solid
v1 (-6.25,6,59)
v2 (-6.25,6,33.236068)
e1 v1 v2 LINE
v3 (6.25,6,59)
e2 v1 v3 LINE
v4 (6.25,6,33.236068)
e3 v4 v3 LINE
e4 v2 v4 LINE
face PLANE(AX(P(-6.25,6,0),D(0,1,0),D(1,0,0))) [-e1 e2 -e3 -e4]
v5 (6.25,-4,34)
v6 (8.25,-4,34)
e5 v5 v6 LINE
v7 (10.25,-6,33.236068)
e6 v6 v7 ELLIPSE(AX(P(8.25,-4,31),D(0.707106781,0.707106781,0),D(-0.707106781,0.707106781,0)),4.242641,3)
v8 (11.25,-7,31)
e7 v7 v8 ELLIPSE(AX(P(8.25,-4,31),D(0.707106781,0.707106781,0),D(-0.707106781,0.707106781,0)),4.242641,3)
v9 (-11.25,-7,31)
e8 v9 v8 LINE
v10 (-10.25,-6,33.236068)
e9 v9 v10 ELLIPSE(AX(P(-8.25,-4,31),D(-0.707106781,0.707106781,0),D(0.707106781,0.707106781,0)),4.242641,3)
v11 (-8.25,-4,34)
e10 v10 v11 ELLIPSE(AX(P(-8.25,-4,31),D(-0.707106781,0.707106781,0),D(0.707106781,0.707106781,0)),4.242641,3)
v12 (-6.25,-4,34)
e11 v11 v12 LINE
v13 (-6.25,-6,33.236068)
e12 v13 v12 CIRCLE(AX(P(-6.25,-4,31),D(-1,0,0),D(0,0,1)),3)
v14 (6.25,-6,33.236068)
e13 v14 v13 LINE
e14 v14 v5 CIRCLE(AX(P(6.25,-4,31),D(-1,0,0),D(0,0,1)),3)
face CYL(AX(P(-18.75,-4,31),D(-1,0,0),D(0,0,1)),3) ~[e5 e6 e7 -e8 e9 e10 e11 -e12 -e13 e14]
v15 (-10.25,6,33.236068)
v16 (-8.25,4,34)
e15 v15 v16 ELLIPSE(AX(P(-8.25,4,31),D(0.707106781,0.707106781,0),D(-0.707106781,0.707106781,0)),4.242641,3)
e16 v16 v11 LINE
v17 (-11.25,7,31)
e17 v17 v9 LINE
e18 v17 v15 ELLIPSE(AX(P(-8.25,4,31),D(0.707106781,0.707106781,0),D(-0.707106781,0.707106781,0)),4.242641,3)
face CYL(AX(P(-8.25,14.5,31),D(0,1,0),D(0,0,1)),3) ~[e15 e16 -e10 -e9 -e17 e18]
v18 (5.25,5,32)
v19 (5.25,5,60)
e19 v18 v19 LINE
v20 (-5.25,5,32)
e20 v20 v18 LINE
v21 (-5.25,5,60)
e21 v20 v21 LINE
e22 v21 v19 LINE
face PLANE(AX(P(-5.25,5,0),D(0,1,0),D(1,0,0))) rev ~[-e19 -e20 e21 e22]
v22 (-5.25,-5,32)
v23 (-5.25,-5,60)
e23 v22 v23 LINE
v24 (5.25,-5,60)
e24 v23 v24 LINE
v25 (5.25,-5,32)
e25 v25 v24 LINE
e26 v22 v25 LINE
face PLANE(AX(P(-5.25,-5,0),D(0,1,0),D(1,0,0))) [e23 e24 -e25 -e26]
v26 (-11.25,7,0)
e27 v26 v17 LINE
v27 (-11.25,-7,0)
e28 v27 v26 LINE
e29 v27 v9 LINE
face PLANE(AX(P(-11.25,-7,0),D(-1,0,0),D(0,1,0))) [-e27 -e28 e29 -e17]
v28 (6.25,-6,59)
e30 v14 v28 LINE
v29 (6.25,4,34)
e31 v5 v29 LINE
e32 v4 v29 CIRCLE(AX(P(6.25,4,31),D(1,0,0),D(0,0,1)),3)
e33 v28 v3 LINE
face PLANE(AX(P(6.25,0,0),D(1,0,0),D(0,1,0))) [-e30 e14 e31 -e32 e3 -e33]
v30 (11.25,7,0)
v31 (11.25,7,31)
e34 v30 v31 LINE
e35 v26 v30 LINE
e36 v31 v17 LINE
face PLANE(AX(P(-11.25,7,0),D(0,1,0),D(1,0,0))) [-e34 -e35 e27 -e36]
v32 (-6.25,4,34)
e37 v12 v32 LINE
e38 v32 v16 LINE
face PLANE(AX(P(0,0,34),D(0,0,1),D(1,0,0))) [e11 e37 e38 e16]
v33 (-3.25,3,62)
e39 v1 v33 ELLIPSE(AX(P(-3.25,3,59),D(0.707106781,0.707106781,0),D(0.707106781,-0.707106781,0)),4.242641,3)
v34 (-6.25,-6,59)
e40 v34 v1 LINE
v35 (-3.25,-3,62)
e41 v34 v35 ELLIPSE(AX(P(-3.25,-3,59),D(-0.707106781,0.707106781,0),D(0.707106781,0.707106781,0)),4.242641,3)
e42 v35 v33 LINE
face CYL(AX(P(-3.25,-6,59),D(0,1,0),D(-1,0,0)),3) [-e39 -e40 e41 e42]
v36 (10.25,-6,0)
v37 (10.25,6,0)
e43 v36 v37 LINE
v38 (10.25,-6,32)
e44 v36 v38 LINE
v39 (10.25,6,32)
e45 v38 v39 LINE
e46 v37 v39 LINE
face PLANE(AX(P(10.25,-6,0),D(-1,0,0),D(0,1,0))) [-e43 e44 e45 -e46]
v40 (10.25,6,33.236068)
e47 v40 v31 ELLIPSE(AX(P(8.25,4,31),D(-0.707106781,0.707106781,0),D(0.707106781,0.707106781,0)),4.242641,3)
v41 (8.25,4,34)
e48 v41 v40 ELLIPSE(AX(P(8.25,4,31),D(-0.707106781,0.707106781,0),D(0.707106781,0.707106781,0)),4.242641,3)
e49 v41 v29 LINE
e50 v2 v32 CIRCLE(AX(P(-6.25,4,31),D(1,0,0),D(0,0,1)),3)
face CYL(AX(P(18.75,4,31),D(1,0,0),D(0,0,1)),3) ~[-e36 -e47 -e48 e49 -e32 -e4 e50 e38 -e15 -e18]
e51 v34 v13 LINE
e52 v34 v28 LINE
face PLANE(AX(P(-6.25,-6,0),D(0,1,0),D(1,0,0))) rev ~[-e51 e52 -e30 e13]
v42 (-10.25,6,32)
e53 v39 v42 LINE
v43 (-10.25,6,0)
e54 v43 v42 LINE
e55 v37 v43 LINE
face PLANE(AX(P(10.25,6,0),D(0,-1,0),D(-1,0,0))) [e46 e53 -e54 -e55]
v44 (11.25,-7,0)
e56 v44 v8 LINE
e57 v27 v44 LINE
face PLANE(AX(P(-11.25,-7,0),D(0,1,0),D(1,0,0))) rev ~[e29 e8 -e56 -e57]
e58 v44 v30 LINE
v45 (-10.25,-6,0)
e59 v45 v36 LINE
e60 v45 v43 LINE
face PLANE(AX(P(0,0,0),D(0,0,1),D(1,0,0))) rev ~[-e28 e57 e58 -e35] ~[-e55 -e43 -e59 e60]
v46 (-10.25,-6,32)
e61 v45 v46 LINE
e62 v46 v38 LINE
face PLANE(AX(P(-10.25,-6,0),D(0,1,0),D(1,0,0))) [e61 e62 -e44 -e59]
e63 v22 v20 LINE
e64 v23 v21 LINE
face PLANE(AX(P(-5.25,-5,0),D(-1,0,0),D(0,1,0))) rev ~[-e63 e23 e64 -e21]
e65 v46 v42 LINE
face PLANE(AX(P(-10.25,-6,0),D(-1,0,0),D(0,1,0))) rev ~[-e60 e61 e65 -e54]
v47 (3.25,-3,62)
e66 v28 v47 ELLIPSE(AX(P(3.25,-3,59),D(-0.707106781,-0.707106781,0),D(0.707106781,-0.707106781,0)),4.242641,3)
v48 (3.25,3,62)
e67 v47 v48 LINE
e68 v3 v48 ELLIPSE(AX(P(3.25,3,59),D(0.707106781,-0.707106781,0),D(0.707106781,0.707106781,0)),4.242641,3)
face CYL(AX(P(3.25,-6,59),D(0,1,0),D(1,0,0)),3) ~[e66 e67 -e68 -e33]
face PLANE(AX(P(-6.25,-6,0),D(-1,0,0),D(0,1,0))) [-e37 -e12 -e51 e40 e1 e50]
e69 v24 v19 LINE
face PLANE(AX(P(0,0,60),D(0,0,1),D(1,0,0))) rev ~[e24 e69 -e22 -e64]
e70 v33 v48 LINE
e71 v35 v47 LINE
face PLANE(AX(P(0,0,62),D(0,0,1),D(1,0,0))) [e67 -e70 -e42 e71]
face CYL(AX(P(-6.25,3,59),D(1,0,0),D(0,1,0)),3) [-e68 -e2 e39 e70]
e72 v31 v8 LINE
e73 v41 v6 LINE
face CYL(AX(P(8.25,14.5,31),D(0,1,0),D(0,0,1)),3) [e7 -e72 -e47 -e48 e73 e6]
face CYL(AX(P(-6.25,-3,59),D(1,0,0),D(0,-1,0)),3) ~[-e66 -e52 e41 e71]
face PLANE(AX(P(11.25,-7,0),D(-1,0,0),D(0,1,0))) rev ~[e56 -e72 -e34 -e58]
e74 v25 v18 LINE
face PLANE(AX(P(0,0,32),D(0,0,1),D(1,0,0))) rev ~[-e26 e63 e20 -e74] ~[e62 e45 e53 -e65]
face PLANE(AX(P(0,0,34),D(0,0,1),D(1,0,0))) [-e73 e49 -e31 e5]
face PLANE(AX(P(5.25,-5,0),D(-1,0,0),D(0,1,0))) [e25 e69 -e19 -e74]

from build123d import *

# Parameters (mm, degrees)
F0_W         = 12.5
F0_H         = 12
F0_W_2       = 10.5
F0_H_2       = 10
F1_DEPTH     = 62
F0_W_3       = 22.5
F0_H_3       = 14
F0_W_4       = 4
F2_DEPTH     = 34
F3_DEPTH     = 60
F4_DEPTH     = 32
F5_R         = 3
F6_T1_DEPTH  = 29
F6_T6_DEPTH  = 37.5
F6_T11_DEPTH = 37.5
F6_T16_DEPTH = 37.5
F6_T21_DEPTH = 37.5
F6_T26_DEPTH = 37.5
F6_T31_DEPTH = 37.5


# Not quite as in the source:
# - a fillet or chamfer that OpenCascade refuses, or shapes differently, is made with other operations: its cross-section is extruded or revolved along the edge and cut away or added


with BuildPart() as f1:
    # F0 (on Top) → F1 (new body)
    with BuildSketch(Plane.XY):
        Rectangle(F0_W, F0_H)
        Rectangle(F0_W_2, F0_H_2, mode=Mode.SUBTRACT)
        Rectangle(F0_W_2, F0_H_2)
    extrude(amount=F1_DEPTH)

    # F0 (on Top) → F2 (join)
    with BuildSketch(Plane.XY):
        Rectangle(F0_W_3, F0_H_3)
        Polygon((-10.25, -6), (-10.25, 6), (-6.25, 6), (6.25, 6), (10.25, 6), (10.25, -6), (6.25, -6), (-6.25, -6), align=None, mode=Mode.SUBTRACT)
        with Locations((-8.25, 0)):
            Rectangle(F0_W_4, F0_H)
        with Locations((8.25, 0)):
            Rectangle(F0_W_4, F0_H)
    extrude(amount=F2_DEPTH)

    # F0 (on Top) → F3 (cut)
    with BuildSketch(Plane.XY):
        Rectangle(F0_W_2, F0_H_2)
    extrude(amount=F3_DEPTH, mode=Mode.SUBTRACT)

    # F0 (on Top) → F4 (cut)
    with BuildSketch(Plane.XY):
        Rectangle(F0_W, F0_H)
        Rectangle(F0_W_2, F0_H_2, mode=Mode.SUBTRACT)
        with Locations((-8.25, 0)):
            Rectangle(F0_W_4, F0_H)
        with Locations((8.25, 0)):
            Rectangle(F0_W_4, F0_H)
    extrude(amount=F4_DEPTH, mode=Mode.SUBTRACT)

    # F5
    f5_edges = [f1.edges().sort_by_distance(p)[0] for p in [
        (0, 6, 62),
        (-6.25, 0, 62),
        (0, -6, 62),
        (6.25, 0, 62),
    ]]
    fillet(f5_edges, radius=F5_R)

    # F6: fillet of radius 3 on 4 edges, made by hand

    # F6_s2 → F6_t1 (cut)
    with BuildSketch(Plane.XZ.offset(-14.5)):
        with BuildLine():
            ThreePointArc((-8.25, 34), (-10.3713203436, 33.1213203436), (-11.25, 31))
            Line((-11.25, 31), (-11.25, 34))
            Line((-11.25, 34), (-8.25, 34))
        make_face()
        with BuildLine():
            ThreePointArc((8.25, 34), (10.3713203436, 33.1213203436), (11.25, 31))
            Line((11.25, 31), (11.25, 34))
            Line((11.25, 34), (8.25, 34))
        make_face()
    extrude(amount=F6_T1_DEPTH, mode=Mode.SUBTRACT)


with BuildPart() as f6_tool4:
    # F6_s5 → F6_t6 (new body)
    with BuildSketch(Plane.YZ.offset(-18.75)):
        with BuildLine():
            ThreePointArc((-4, 34), (-6.1213203436, 33.1213203436), (-7, 31))
            Line((-7, 31), (-7, 34))
            Line((-7, 34), (-4, 34))
        make_face()
    extrude(amount=F6_T6_DEPTH)

    split(bisect_by=Plane.YZ.offset(-6.25), keep=Keep.BOTTOM)


with BuildPart() as f1_1:
    add(f1.part)

    # F6_t3: cut F6_tool4
    add(f6_tool4.part, mode=Mode.SUBTRACT)


with BuildPart() as f6_tool9:
    # F6_s10 → F6_t11 (new body)
    with BuildSketch(Plane.YZ.offset(-18.75)):
        with BuildLine():
            ThreePointArc((-4, 34), (-6.1213203436, 33.1213203436), (-7, 31))
            Line((-7, 31), (-7, 34))
            Line((-7, 34), (-4, 34))
        make_face()
    extrude(amount=F6_T11_DEPTH)

    split(bisect_by=Plane.XZ.offset(6), keep=Keep.TOP)


with BuildPart() as f1_2:
    add(f1_1.part)

    # F6_t8: cut F6_tool9
    add(f6_tool9.part, mode=Mode.SUBTRACT)


with BuildPart() as f6_tool14:
    # F6_s15 → F6_t16 (new body)
    with BuildSketch(Plane.YZ.offset(-18.75)):
        with BuildLine():
            ThreePointArc((-4, 34), (-6.1213203436, 33.1213203436), (-7, 31))
            Line((-7, 31), (-7, 34))
            Line((-7, 34), (-4, 34))
        make_face()
    extrude(amount=F6_T16_DEPTH)

    split(bisect_by=Plane.YZ.offset(6.25), keep=Keep.TOP)


with BuildPart() as f1_3:
    add(f1_2.part)

    # F6_t13: cut F6_tool14
    add(f6_tool14.part, mode=Mode.SUBTRACT)


with BuildPart() as f6_tool19:
    # F6_s20 → F6_t21 (new body)
    with BuildSketch(Plane.YZ.offset(18.75)):
        with BuildLine():
            ThreePointArc((4, 34), (6.1213203436, 33.1213203436), (7, 31))
            Line((7, 31), (7, 34))
            Line((7, 34), (4, 34))
        make_face()
    extrude(amount=-F6_T21_DEPTH)

    split(bisect_by=Plane.YZ.offset(6.25), keep=Keep.TOP)


with BuildPart() as f1_4:
    add(f1_3.part)

    # F6_t18: cut F6_tool19
    add(f6_tool19.part, mode=Mode.SUBTRACT)


with BuildPart() as f6_tool24:
    # F6_s25 → F6_t26 (new body)
    with BuildSketch(Plane.YZ.offset(18.75)):
        with BuildLine():
            ThreePointArc((4, 34), (6.1213203436, 33.1213203436), (7, 31))
            Line((7, 31), (7, 34))
            Line((7, 34), (4, 34))
        make_face()
    extrude(amount=-F6_T26_DEPTH)

    split(bisect_by=Plane.XZ.offset(-6), keep=Keep.BOTTOM)


with BuildPart() as f1_5:
    add(f1_4.part)

    # F6_t23: cut F6_tool24
    add(f6_tool24.part, mode=Mode.SUBTRACT)


with BuildPart() as f6_tool29:
    # F6_s30 → F6_t31 (new body)
    with BuildSketch(Plane.YZ.offset(18.75)):
        with BuildLine():
            ThreePointArc((4, 34), (6.1213203436, 33.1213203436), (7, 31))
            Line((7, 31), (7, 34))
            Line((7, 34), (4, 34))
        make_face()
    extrude(amount=-F6_T31_DEPTH)

    split(bisect_by=Plane.YZ.offset(-6.25), keep=Keep.BOTTOM)


with BuildPart() as f1_6:
    add(f1_5.part)

    # F6_t28: cut F6_tool29
    add(f6_tool29.part, mode=Mode.SUBTRACT)


solid = f1_6.part
